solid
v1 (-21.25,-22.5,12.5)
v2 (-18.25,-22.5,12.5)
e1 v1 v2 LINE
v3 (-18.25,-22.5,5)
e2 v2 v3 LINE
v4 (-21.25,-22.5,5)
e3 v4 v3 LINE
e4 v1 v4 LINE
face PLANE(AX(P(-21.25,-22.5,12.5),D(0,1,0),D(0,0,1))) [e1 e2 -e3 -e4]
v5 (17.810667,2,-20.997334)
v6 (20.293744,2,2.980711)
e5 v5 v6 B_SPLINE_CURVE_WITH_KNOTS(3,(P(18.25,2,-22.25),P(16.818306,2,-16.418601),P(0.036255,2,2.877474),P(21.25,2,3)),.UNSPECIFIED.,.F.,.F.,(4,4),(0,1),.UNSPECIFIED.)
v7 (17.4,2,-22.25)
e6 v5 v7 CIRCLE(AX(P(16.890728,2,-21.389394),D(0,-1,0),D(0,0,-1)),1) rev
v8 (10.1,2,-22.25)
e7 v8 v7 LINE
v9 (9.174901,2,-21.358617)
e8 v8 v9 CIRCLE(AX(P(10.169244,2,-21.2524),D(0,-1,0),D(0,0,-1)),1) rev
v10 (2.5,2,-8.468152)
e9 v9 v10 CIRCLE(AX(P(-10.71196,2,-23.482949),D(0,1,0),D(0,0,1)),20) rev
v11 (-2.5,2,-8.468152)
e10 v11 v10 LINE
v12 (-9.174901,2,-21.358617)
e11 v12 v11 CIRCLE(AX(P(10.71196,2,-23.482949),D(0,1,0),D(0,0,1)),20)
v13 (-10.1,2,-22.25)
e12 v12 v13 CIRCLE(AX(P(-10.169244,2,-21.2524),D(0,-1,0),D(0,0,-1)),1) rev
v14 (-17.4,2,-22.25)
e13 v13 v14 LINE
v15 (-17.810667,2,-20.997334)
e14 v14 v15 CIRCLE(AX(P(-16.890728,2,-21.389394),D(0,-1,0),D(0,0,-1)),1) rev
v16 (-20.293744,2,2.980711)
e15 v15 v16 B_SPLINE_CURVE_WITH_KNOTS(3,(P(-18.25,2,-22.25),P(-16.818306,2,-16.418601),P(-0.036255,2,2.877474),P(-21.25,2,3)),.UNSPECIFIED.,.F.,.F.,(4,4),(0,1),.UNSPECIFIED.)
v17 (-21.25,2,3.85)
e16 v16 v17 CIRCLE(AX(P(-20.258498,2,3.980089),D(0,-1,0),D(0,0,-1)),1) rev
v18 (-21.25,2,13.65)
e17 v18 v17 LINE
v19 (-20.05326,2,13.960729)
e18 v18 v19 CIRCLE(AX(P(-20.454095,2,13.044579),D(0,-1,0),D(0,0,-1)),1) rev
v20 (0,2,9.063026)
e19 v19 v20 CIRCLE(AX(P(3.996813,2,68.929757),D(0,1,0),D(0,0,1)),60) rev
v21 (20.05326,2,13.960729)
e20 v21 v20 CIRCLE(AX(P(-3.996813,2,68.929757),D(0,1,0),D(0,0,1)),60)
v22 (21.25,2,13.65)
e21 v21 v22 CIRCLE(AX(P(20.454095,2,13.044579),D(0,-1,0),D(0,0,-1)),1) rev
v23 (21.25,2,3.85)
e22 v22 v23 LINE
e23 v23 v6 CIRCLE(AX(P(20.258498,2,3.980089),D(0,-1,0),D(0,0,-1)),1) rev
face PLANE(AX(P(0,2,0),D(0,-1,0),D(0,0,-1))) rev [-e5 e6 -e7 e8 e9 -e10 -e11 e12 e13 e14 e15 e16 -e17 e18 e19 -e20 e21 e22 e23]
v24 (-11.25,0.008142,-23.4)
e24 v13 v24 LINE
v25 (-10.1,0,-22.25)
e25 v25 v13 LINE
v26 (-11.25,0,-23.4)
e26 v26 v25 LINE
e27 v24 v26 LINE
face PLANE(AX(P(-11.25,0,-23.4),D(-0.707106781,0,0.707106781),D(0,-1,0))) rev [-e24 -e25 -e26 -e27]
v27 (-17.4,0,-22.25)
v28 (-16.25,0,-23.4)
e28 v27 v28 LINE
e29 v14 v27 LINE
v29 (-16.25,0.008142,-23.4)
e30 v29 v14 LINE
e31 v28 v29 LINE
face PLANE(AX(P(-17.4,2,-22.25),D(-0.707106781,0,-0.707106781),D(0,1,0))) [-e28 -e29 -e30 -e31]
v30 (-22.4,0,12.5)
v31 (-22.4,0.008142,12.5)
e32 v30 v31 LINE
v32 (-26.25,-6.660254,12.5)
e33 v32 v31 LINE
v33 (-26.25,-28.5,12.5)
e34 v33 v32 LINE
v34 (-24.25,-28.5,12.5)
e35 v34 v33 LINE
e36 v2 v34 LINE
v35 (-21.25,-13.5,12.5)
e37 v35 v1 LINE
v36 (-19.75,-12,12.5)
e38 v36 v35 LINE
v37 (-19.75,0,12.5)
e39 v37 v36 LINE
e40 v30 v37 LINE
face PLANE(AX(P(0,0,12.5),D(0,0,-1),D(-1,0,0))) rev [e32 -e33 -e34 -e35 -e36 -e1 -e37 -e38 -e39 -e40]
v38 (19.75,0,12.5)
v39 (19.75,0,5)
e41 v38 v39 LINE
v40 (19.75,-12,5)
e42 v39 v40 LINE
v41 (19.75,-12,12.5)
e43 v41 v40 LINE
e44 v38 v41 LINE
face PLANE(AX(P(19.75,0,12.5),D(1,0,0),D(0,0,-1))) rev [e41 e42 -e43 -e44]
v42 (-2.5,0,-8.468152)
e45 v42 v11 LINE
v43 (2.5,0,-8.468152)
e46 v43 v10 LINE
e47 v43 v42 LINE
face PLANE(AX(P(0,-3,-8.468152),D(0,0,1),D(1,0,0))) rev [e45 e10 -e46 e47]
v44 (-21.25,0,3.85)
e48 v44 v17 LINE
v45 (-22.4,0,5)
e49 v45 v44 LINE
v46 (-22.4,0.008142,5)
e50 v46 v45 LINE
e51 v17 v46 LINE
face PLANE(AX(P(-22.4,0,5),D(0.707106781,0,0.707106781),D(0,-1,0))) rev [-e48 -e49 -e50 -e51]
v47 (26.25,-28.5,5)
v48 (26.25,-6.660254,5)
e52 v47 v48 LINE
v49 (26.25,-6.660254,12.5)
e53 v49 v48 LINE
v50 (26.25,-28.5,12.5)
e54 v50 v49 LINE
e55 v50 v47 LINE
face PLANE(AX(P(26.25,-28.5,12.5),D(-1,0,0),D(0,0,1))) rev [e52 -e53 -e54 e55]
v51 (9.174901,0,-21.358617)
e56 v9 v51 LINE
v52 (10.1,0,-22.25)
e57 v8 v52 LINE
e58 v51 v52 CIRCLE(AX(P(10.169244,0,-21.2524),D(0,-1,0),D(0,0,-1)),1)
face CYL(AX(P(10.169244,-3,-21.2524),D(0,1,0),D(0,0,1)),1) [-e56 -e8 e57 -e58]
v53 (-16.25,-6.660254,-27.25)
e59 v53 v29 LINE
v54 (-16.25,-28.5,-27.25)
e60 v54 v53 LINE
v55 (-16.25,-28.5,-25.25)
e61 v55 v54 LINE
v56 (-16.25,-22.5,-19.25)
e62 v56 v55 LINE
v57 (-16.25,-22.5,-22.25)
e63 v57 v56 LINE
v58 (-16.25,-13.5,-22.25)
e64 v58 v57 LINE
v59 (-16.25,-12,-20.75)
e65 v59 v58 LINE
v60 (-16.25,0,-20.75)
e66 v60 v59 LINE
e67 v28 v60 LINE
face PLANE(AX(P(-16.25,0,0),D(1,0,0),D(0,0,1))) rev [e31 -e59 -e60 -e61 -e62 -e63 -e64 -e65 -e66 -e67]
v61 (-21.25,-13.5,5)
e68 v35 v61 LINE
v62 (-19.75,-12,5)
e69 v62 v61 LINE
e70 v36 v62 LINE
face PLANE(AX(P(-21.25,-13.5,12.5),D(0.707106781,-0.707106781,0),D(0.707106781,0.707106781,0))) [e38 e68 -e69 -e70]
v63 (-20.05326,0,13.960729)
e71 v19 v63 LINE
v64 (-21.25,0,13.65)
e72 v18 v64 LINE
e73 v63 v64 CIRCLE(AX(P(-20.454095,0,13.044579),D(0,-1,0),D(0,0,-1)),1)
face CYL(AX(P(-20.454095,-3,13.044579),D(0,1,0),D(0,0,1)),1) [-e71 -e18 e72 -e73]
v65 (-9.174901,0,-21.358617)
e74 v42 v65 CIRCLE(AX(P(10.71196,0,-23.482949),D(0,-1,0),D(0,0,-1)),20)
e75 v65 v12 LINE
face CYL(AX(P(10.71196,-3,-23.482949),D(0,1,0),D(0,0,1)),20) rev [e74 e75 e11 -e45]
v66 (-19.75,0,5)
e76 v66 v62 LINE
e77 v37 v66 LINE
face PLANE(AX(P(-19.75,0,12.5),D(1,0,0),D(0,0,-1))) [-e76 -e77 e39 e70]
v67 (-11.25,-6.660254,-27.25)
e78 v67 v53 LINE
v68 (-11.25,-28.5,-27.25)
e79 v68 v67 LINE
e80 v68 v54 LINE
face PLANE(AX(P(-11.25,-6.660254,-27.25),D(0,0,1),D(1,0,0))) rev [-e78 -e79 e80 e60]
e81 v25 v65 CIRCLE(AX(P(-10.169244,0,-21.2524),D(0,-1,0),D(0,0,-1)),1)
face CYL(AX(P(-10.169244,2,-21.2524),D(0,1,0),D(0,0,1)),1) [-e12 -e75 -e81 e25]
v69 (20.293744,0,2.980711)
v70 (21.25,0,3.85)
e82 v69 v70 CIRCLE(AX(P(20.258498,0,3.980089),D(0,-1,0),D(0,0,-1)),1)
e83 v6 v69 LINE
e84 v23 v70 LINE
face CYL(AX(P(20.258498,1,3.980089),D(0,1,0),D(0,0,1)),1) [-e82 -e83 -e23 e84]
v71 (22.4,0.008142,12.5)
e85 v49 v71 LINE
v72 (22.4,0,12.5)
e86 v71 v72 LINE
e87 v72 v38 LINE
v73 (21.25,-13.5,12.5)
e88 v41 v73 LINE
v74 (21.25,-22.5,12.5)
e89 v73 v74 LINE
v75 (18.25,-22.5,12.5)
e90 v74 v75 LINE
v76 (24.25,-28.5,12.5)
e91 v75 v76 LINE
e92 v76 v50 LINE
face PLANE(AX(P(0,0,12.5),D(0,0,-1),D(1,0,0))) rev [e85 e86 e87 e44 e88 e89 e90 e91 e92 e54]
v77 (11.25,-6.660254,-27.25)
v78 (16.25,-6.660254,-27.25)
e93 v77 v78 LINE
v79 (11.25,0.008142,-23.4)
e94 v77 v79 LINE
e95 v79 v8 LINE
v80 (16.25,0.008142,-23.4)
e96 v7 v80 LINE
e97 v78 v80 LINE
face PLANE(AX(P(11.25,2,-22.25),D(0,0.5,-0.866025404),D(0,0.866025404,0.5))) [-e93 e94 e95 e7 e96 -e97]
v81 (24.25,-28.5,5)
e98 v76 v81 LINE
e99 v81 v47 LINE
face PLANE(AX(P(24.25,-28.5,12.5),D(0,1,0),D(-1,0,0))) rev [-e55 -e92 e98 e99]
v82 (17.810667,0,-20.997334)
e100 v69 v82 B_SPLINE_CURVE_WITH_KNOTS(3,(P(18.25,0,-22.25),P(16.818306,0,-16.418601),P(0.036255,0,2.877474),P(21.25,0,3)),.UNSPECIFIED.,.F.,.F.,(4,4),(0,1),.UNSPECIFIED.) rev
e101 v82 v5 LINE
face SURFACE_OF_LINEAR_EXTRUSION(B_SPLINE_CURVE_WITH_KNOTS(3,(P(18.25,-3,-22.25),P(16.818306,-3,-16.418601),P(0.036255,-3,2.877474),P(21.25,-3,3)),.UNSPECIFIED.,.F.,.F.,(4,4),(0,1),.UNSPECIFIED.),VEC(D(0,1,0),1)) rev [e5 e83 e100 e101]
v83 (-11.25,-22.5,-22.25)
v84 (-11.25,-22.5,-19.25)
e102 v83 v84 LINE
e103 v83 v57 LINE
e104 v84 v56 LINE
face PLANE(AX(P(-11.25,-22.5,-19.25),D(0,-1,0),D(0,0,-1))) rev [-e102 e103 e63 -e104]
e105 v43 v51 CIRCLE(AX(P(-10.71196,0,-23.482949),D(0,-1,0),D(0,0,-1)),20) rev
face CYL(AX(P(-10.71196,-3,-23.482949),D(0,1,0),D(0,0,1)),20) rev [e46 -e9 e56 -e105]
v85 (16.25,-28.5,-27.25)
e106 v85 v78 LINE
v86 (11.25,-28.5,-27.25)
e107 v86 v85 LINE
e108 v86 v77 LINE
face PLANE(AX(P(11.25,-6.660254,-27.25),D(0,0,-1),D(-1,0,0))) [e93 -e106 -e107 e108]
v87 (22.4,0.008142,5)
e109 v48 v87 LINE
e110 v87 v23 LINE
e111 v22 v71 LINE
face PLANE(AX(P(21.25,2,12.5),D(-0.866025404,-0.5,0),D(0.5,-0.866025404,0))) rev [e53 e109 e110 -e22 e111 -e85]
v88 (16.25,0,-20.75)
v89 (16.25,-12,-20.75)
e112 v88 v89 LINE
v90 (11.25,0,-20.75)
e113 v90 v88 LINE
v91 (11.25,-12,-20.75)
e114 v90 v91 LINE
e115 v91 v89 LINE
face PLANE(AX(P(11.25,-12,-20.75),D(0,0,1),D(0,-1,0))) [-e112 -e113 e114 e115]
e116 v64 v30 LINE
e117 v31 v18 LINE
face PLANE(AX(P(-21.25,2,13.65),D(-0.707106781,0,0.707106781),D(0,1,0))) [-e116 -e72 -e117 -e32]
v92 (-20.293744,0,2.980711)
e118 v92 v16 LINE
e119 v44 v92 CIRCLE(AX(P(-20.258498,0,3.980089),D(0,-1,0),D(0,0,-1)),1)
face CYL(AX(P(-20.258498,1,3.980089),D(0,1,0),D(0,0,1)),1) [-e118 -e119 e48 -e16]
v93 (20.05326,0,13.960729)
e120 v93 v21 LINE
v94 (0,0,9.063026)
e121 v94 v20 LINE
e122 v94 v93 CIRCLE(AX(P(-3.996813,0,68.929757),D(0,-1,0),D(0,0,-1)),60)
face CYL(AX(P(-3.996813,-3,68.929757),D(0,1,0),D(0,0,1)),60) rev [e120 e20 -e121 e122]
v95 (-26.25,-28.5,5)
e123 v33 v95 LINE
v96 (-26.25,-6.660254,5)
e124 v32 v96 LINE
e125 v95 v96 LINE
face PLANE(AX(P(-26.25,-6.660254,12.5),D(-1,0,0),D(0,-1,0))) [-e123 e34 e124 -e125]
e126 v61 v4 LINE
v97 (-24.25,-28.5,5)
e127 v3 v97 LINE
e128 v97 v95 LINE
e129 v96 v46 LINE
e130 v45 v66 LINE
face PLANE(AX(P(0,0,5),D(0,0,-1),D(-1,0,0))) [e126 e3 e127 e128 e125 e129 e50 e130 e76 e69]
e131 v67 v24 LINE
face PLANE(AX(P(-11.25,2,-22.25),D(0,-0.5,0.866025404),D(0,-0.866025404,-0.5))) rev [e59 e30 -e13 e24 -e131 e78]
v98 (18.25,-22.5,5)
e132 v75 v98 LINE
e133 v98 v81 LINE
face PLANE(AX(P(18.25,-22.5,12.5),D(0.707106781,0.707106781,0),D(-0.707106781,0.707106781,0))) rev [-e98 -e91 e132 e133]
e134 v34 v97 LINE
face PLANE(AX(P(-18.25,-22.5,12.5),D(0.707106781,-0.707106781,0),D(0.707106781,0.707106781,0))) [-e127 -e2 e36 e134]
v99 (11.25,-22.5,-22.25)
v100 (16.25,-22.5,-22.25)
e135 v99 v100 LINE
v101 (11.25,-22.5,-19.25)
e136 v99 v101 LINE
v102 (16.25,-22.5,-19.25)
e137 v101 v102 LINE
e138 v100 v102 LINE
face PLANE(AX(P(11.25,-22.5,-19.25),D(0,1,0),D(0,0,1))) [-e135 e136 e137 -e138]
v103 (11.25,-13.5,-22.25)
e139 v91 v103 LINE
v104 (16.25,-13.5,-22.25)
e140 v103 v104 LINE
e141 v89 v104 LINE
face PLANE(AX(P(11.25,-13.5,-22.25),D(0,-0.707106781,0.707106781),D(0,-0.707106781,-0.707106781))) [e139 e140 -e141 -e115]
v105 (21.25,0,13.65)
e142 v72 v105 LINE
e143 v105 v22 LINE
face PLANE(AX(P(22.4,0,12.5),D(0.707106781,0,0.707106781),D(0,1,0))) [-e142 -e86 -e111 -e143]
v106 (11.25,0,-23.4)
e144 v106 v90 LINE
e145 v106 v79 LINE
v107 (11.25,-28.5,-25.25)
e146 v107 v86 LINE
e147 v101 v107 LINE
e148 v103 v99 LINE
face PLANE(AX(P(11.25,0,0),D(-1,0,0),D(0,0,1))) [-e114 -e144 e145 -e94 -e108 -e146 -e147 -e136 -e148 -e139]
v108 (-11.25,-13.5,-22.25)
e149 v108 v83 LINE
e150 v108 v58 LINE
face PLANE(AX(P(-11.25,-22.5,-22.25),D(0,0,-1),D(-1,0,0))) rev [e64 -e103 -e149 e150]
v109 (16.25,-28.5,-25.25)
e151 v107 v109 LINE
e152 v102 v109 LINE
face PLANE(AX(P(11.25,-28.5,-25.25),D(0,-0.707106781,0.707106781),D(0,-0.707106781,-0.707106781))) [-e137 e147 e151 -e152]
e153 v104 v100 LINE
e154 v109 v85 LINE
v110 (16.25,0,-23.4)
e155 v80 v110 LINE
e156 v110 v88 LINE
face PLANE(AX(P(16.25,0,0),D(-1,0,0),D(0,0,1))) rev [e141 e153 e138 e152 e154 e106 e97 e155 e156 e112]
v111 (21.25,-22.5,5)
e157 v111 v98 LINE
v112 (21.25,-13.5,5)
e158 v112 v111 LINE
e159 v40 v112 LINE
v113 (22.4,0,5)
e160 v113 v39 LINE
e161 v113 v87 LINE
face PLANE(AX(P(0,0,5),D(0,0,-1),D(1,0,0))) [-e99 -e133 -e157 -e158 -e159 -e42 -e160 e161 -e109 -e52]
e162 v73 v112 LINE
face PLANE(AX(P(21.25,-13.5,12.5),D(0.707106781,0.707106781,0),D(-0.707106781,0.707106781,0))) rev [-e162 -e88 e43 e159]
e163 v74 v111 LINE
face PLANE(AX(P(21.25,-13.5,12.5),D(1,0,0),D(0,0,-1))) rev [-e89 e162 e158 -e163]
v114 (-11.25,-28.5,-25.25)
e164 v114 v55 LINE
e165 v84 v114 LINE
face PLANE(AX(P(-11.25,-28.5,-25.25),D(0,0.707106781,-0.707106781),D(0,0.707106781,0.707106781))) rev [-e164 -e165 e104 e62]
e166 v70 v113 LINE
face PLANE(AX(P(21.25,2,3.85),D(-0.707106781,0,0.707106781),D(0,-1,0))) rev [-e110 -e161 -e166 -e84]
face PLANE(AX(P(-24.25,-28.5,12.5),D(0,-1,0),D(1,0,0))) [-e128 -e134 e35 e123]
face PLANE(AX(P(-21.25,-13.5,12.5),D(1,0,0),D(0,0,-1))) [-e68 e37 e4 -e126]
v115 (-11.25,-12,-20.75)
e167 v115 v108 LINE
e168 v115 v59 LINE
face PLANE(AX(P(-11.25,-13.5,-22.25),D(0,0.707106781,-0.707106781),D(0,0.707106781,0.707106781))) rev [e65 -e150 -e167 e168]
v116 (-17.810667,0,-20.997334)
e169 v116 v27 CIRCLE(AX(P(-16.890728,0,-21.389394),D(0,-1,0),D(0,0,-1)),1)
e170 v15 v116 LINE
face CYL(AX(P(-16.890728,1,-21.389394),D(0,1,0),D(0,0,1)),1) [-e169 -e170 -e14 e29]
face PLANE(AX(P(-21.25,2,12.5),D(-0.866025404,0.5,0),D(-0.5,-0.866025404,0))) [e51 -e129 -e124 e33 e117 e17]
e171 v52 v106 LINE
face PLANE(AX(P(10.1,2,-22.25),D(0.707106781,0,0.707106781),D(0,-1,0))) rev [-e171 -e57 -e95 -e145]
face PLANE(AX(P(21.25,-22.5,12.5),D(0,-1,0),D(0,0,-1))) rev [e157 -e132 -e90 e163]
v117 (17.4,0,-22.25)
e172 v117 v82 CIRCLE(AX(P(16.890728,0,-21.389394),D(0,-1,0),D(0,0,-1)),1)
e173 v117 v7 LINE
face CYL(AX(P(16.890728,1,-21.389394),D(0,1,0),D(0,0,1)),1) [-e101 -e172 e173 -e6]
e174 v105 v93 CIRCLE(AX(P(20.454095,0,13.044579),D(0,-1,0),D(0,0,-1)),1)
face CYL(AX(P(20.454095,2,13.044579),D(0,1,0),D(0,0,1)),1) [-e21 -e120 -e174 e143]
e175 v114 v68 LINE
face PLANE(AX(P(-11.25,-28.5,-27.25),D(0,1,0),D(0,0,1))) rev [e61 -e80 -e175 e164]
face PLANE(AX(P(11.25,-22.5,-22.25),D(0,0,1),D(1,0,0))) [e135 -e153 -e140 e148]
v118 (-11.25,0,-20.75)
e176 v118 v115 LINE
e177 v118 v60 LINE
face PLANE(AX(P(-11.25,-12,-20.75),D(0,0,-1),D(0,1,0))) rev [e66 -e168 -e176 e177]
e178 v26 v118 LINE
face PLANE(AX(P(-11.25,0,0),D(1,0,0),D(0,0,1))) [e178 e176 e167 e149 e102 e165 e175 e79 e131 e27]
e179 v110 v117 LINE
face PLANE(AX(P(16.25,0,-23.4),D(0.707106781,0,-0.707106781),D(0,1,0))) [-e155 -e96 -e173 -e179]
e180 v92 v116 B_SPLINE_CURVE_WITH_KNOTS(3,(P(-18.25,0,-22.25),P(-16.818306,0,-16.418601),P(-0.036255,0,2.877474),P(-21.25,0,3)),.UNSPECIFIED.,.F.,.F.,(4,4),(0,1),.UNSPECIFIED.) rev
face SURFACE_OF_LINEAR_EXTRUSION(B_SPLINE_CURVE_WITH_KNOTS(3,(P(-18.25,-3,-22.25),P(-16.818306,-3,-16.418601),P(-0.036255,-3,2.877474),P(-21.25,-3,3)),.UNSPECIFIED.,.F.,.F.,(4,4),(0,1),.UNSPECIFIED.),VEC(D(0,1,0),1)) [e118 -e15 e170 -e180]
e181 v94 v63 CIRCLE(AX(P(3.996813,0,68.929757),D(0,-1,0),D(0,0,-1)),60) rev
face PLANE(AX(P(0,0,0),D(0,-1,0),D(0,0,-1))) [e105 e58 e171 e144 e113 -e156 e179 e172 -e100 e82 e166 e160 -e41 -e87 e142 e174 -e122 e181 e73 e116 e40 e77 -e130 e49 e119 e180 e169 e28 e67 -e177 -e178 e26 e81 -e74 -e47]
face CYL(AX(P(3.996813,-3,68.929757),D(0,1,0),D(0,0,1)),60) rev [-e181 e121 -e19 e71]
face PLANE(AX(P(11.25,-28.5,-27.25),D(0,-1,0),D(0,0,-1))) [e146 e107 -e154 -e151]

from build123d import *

# Parameters (mm, degrees)
SKETCH1_W           = 42.5
SKETCH1_H           = 44.5
BOSS_EXTRUDE1_DEPTH = 2
BOSS_EXTRUDE2_START = -27.25
BOSS_EXTRUDE2_DEPTH = 7.5
BOSS_EXTRUDE3_START = -5
BOSS_EXTRUDE3_DEPTH = 5
CUT_EXTRUDE3_DEPTH  = 5
CHAMFER1_SIZE       = 1.15
FILLET1_R           = 1


with BuildPart() as part:
    # Sketch1 → Boss-Extrude1 (new body)
    with BuildSketch(Plane(origin=(0, 0, 0), x_dir=(1, 0, 0), z_dir=(0, 1, 0))):
        Rectangle(SKETCH1_W, SKETCH1_H)
    extrude(amount=BOSS_EXTRUDE1_DEPTH)

    # Sketch2 → Boss-Extrude2 (add)
    with BuildSketch(Plane(origin=(0, 0, -22.25), x_dir=(-1, 0, 0), z_dir=(0, 0, -1)).offset(BOSS_EXTRUDE2_START)):
        Polygon((21.25, -22.5), (18.25, -22.5), (24.25, -28.5), (26.25, -28.5), (26.25, -18), (26.25, -6.660254038), (21.25, 2), (21.25, 0), (19.75, 0), (19.75, -12), (21.25, -13.5), align=None)
    boss_extrude2 = extrude(amount=-BOSS_EXTRUDE2_DEPTH)

    # Mirror1: Boss-Extrude2 across plane
    add(boss_extrude2.mirror(Plane(origin=(0, 0, 0), x_dir=(0, 0, 1), z_dir=(1, 0, 0))))

    # Sketch4 → Boss-Extrude3 (add)
    with BuildSketch(Plane(origin=(21.25, 0, 0), x_dir=(0, 0, -1), z_dir=(1, 0, 0)).offset(BOSS_EXTRUDE3_START)):
        Polygon((27.25, -6.660254038), (27.25, -28.5), (25.25, -28.5), (19.25, -22.5), (22.25, -22.5), (22.25, -13.5), (20.75, -12), (20.75, 0), (22.25, 0), (22.25, 2), align=None)
    boss_extrude3 = extrude(amount=-BOSS_EXTRUDE3_DEPTH)

    # Mirror2: Boss-Extrude3 across plane
    add(boss_extrude3.mirror(Plane(origin=(0, 0, 0), x_dir=(0, 0, 1), z_dir=(1, 0, 0))))

    # Sketch5 → Cut-Extrude3 (cut)
    with BuildSketch(Plane(origin=(0, 2, 0), x_dir=(1, 0, 0), z_dir=(0, 1, 0))):
        with BuildLine():
            ThreePointArc((0, -9.063025703), (-10.875563664, -10.802203854), (-21.25, -14.5))
            Line((-21.25, -14.5), (-21.25, -22.25))
            Line((-21.25, -22.25), (21.25, -22.25))
            Line((21.25, -22.25), (21.25, -14.5))
            ThreePointArc((21.25, -14.5), (10.875563664, -10.802203854), (0, -9.063025703))
        make_face()
        with BuildLine():
            Line((-21.25, 22.25), (-21.25, -3))
            add(Edge.make_bspline(
                [(-18.25, 22.25), (-16.81830639, 16.418600695), (-0.036255197, -2.877473786), (-21.25, -3)],
                knots=[0, 0, 0, 0, 1, 1, 1, 1], degree=3))
            Line((-18.25, 22.25), (-21.25, 22.25))
        make_face()
        with BuildLine():
            Line((-2.5, 8.468152214), (2.5, 8.468152214))
            ThreePointArc((2.5, 8.468152214), (7.249445146, 14.685907684), (9.25, 22.25))
            Line((9.25, 22.25), (-9.25, 22.25))
            ThreePointArc((-9.25, 22.25), (-7.249445146, 14.685907684), (-2.5, 8.468152214))
        make_face()
        with BuildLine():
            add(Edge.make_bspline(
                [(18.25, 22.25), (16.81830639, 16.418600695), (0.036255197, -2.877473786), (21.25, -3)],
                knots=[0, 0, 0, 0, 1, 1, 1, 1], degree=3))
            Line((21.25, -3), (21.25, 22.25))
            Line((21.25, 22.25), (18.25, 22.25))
        make_face()
    extrude(amount=-CUT_EXTRUDE3_DEPTH, mode=Mode.SUBTRACT)

    # Chamfer1
    chamfer1_edges = [part.edges().sort_by_distance(p)[0] for p in [
        (-11.25, 1, -22.25),
        (-21.25, 1, 12.5),
        (-21.25, 1, 5),
        (21.25, 1, 5),
        (21.25, 1, 12.5),
        (11.25, 1, -22.25),
        (16.25, 1, -22.25),
        (-16.25, 1, -22.25),
    ]]
    chamfer(chamfer1_edges, length=CHAMFER1_SIZE)

    # Fillet1
    # the kernel refuses this fillet: 1 mm, written as the material it takes off along each edge
    with BuildSketch(Plane(origin=(-21.25, 4.391127169, 3), x_dir=(0, 0, 1), z_dir=(0, -1, 0))) as fillet1_piece_1:
        with BuildLine():
            CenterArc((0.980089216, -0.991502292), FILLET1_R, 97.474747775, 80.505389302)
            Line((-0.019289453, -0.956256336), (-0.039277026, -0.955551417))
            ThreePointArc((-0.039277026, -0.955551417), (-0.026119359, -0.477798689), (-0.019999666, 0.000115514))
            Line((-0.019999666, 0.000115514), (0, 0.02))
            ThreePointArc((0, 0.02), (0.425, 0.02), (0.847398216, 0.019830046))
            Line((0.847398216, 0.019830046), (0.85, 0))
        make_face()
    extrude(amount=6.782254339, mode=Mode.SUBTRACT)
    with BuildSketch(Plane(origin=(-18.25, 5.318683713, -22.25), x_dir=(0.3309539081211192, 0, 0.9436469205690006), z_dir=(0, -1, 0))) as fillet1_piece_2:
        with BuildLine():
            CenterArc((1.261964238, -0.997851962), FILLET1_R, 86.243906852, 82.467431806)
            Line((0.281310822, -0.802099882), (0.261697754, -0.798184841))
            ThreePointArc((0.261697754, -0.798184841), (0.121782473, -0.407669019), (-0.018872938, -0.006619078))
            Line((-0.018872938, -0.006619078), (-0.001928232, 0.019906831))
            ThreePointArc((-0.001928232, 0.019906831), (0.664077557, 0.04586364), (1.32878367, 0.019957039))
            Line((1.32878367, 0.019957039), (1.327473485, 0))
        make_face()
    extrude(amount=8.637367425, mode=Mode.SUBTRACT)
    with BuildSketch(Plane(origin=(-9.25, 4.236352912, -22.25), x_dir=(-1, 0, 0), z_dir=(0, -1, 0))) as fillet1_piece_3:
        with BuildLine():
            CenterArc((0.919243583, -0.997599783), FILLET1_R, 93.970542278, 79.932192876)
            Line((-0.075099433, -0.891383179), (-0.094986293, -0.889258846))
            ThreePointArc((-0.094986293, -0.889258846), (-0.052494869, -0.444432453), (-0.01996196, 0.001232949))
            Line((-0.01996196, 0.001232949), (0, 0.02))
            ThreePointArc((0, 0.02), (0.425, 0.02), (0.848615128, 0.019951996))
            Line((0.848615128, 0.019951996), (0.85, 0))
        make_face()
    extrude(amount=6.472705825, mode=Mode.SUBTRACT)
    with BuildSketch(Plane(origin=(9.25, 4.236352912, -22.25), x_dir=(-0.08395302082723771, 0, 0.9964697136862621), z_dir=(0, -1, 0))) as fillet1_piece_4:
        with BuildLine():
            CenterArc((0.916904694, -0.999749905), FILLET1_R, 91.281442663, 79.932192876)
            Line((-0.071360068, -0.846999257), (-0.091125363, -0.843944244))
            ThreePointArc((-0.091125363, -0.843944244), (-0.055609428, -0.421820568), (-0.019929394, 0.00167906))
            Line((-0.019929394, 0.00167906), (0.000447271, 0.019994998))
            ThreePointArc((0.000447271, 0.019994998), (0.447270582, 0.0149981), (0.894093894, 0.019994998))
            Line((0.894093894, 0.019994998), (0.894541165, 0))
        make_face()
    extrude(amount=6.472705825, mode=Mode.SUBTRACT)
    with BuildSketch(Plane(origin=(18.25, 5.318683713, -22.25), x_dir=(-1, 0, 0), z_dir=(0, -1, 0))) as fillet1_piece_5:
        with BuildLine():
            CenterArc((1.359271928, -0.860605661), FILLET1_R, 120.615345392, 82.467431806)
            Line((0.439332538, -1.252666266), (0.42093375, -1.260507478))
            ThreePointArc((0.42093375, -1.260507478), (0.17649998, -0.641833493), (-0.019423176, -0.004768673))
            Line((-0.019423176, -0.004768673), (0, 0.02))
            ThreePointArc((0, 0.02), (0.425, 0.02), (0.839814561, 0.017212113))
            Line((0.839814561, 0.017212113), (0.85, 0))
        make_face()
    extrude(amount=8.637367425, mode=Mode.SUBTRACT)
    with BuildSketch(Plane(origin=(21.25, 4.391127169, 3), x_dir=(-0.9997966104440278, 0, -0.020167740196489006), z_dir=(0, -1, 0))) as fillet1_piece_6:
        with BuildLine():
            CenterArc((0.971534447, -0.999886236), FILLET1_R, 90.864258181, 80.505389302)
            Line((-0.017142579, -0.849827119), (-0.03691612, -0.846825937))
            ThreePointArc((-0.03691612, -0.846825937), (-0.028567222, -0.424510205), (-0.019995932, 0.000403355))
            Line((-0.019995932, 0.000403355), (0.000287858, 0.019997928))
            ThreePointArc((0.000287858, 0.019997928), (0.478228278, 0.016477927), (0.956149196, 0.019997725))
            Line((0.956149196, 0.019997725), (0.956450868, 0))
        make_face()
    extrude(amount=6.782254339, mode=Mode.SUBTRACT)
    with BuildSketch(Plane(origin=(21.25, 5.281576595, 14.5), x_dir=(0, 0, -1), z_dir=(0, -1, 0))) as fillet1_piece_7:
        with BuildLine():
            CenterArc((1.455421085, -0.79590534), FILLET1_R, 127.259148945, 76.371212097)
            Line((0.539270629, -1.196739897), (0.52094762, -1.204756588))
            ThreePointArc((0.52094762, -1.204756588), (0.254673852, -0.605111829), (-0.018143252, -0.008415604))
            Line((-0.018143252, -0.008415604), (0, 0.02))
            ThreePointArc((0, 0.02), (0.425, 0.02), (0.837891578, 0.015918107))
            Line((0.837891578, 0.015918107), (0.85, 0))
        make_face()
    extrude(amount=8.56315319, mode=Mode.SUBTRACT)
    with BuildSketch(Plane(origin=(-21.25, 5.281576595, 14.5), x_dir=(0, 0, -1), z_dir=(0, -1, 0))) as fillet1_piece_8:
        with BuildLine():
            CenterArc((1.455421085, 0.79590534), FILLET1_R, 156.369638958, 76.371212097)
            Line((0.539270629, 1.196739897), (0.52094762, 1.204756588))
            ThreePointArc((0.52094762, 1.204756588), (0.254673852, 0.605111829), (-0.018143252, 0.008415604))
            Line((-0.018143252, 0.008415604), (0, -0.02))
            ThreePointArc((0, -0.02), (0.425, -0.02), (0.837891578, -0.015918107))
            Line((0.837891578, -0.015918107), (0.85, 0))
        make_face()
    extrude(amount=8.56315319, mode=Mode.SUBTRACT)


solid = part.part
